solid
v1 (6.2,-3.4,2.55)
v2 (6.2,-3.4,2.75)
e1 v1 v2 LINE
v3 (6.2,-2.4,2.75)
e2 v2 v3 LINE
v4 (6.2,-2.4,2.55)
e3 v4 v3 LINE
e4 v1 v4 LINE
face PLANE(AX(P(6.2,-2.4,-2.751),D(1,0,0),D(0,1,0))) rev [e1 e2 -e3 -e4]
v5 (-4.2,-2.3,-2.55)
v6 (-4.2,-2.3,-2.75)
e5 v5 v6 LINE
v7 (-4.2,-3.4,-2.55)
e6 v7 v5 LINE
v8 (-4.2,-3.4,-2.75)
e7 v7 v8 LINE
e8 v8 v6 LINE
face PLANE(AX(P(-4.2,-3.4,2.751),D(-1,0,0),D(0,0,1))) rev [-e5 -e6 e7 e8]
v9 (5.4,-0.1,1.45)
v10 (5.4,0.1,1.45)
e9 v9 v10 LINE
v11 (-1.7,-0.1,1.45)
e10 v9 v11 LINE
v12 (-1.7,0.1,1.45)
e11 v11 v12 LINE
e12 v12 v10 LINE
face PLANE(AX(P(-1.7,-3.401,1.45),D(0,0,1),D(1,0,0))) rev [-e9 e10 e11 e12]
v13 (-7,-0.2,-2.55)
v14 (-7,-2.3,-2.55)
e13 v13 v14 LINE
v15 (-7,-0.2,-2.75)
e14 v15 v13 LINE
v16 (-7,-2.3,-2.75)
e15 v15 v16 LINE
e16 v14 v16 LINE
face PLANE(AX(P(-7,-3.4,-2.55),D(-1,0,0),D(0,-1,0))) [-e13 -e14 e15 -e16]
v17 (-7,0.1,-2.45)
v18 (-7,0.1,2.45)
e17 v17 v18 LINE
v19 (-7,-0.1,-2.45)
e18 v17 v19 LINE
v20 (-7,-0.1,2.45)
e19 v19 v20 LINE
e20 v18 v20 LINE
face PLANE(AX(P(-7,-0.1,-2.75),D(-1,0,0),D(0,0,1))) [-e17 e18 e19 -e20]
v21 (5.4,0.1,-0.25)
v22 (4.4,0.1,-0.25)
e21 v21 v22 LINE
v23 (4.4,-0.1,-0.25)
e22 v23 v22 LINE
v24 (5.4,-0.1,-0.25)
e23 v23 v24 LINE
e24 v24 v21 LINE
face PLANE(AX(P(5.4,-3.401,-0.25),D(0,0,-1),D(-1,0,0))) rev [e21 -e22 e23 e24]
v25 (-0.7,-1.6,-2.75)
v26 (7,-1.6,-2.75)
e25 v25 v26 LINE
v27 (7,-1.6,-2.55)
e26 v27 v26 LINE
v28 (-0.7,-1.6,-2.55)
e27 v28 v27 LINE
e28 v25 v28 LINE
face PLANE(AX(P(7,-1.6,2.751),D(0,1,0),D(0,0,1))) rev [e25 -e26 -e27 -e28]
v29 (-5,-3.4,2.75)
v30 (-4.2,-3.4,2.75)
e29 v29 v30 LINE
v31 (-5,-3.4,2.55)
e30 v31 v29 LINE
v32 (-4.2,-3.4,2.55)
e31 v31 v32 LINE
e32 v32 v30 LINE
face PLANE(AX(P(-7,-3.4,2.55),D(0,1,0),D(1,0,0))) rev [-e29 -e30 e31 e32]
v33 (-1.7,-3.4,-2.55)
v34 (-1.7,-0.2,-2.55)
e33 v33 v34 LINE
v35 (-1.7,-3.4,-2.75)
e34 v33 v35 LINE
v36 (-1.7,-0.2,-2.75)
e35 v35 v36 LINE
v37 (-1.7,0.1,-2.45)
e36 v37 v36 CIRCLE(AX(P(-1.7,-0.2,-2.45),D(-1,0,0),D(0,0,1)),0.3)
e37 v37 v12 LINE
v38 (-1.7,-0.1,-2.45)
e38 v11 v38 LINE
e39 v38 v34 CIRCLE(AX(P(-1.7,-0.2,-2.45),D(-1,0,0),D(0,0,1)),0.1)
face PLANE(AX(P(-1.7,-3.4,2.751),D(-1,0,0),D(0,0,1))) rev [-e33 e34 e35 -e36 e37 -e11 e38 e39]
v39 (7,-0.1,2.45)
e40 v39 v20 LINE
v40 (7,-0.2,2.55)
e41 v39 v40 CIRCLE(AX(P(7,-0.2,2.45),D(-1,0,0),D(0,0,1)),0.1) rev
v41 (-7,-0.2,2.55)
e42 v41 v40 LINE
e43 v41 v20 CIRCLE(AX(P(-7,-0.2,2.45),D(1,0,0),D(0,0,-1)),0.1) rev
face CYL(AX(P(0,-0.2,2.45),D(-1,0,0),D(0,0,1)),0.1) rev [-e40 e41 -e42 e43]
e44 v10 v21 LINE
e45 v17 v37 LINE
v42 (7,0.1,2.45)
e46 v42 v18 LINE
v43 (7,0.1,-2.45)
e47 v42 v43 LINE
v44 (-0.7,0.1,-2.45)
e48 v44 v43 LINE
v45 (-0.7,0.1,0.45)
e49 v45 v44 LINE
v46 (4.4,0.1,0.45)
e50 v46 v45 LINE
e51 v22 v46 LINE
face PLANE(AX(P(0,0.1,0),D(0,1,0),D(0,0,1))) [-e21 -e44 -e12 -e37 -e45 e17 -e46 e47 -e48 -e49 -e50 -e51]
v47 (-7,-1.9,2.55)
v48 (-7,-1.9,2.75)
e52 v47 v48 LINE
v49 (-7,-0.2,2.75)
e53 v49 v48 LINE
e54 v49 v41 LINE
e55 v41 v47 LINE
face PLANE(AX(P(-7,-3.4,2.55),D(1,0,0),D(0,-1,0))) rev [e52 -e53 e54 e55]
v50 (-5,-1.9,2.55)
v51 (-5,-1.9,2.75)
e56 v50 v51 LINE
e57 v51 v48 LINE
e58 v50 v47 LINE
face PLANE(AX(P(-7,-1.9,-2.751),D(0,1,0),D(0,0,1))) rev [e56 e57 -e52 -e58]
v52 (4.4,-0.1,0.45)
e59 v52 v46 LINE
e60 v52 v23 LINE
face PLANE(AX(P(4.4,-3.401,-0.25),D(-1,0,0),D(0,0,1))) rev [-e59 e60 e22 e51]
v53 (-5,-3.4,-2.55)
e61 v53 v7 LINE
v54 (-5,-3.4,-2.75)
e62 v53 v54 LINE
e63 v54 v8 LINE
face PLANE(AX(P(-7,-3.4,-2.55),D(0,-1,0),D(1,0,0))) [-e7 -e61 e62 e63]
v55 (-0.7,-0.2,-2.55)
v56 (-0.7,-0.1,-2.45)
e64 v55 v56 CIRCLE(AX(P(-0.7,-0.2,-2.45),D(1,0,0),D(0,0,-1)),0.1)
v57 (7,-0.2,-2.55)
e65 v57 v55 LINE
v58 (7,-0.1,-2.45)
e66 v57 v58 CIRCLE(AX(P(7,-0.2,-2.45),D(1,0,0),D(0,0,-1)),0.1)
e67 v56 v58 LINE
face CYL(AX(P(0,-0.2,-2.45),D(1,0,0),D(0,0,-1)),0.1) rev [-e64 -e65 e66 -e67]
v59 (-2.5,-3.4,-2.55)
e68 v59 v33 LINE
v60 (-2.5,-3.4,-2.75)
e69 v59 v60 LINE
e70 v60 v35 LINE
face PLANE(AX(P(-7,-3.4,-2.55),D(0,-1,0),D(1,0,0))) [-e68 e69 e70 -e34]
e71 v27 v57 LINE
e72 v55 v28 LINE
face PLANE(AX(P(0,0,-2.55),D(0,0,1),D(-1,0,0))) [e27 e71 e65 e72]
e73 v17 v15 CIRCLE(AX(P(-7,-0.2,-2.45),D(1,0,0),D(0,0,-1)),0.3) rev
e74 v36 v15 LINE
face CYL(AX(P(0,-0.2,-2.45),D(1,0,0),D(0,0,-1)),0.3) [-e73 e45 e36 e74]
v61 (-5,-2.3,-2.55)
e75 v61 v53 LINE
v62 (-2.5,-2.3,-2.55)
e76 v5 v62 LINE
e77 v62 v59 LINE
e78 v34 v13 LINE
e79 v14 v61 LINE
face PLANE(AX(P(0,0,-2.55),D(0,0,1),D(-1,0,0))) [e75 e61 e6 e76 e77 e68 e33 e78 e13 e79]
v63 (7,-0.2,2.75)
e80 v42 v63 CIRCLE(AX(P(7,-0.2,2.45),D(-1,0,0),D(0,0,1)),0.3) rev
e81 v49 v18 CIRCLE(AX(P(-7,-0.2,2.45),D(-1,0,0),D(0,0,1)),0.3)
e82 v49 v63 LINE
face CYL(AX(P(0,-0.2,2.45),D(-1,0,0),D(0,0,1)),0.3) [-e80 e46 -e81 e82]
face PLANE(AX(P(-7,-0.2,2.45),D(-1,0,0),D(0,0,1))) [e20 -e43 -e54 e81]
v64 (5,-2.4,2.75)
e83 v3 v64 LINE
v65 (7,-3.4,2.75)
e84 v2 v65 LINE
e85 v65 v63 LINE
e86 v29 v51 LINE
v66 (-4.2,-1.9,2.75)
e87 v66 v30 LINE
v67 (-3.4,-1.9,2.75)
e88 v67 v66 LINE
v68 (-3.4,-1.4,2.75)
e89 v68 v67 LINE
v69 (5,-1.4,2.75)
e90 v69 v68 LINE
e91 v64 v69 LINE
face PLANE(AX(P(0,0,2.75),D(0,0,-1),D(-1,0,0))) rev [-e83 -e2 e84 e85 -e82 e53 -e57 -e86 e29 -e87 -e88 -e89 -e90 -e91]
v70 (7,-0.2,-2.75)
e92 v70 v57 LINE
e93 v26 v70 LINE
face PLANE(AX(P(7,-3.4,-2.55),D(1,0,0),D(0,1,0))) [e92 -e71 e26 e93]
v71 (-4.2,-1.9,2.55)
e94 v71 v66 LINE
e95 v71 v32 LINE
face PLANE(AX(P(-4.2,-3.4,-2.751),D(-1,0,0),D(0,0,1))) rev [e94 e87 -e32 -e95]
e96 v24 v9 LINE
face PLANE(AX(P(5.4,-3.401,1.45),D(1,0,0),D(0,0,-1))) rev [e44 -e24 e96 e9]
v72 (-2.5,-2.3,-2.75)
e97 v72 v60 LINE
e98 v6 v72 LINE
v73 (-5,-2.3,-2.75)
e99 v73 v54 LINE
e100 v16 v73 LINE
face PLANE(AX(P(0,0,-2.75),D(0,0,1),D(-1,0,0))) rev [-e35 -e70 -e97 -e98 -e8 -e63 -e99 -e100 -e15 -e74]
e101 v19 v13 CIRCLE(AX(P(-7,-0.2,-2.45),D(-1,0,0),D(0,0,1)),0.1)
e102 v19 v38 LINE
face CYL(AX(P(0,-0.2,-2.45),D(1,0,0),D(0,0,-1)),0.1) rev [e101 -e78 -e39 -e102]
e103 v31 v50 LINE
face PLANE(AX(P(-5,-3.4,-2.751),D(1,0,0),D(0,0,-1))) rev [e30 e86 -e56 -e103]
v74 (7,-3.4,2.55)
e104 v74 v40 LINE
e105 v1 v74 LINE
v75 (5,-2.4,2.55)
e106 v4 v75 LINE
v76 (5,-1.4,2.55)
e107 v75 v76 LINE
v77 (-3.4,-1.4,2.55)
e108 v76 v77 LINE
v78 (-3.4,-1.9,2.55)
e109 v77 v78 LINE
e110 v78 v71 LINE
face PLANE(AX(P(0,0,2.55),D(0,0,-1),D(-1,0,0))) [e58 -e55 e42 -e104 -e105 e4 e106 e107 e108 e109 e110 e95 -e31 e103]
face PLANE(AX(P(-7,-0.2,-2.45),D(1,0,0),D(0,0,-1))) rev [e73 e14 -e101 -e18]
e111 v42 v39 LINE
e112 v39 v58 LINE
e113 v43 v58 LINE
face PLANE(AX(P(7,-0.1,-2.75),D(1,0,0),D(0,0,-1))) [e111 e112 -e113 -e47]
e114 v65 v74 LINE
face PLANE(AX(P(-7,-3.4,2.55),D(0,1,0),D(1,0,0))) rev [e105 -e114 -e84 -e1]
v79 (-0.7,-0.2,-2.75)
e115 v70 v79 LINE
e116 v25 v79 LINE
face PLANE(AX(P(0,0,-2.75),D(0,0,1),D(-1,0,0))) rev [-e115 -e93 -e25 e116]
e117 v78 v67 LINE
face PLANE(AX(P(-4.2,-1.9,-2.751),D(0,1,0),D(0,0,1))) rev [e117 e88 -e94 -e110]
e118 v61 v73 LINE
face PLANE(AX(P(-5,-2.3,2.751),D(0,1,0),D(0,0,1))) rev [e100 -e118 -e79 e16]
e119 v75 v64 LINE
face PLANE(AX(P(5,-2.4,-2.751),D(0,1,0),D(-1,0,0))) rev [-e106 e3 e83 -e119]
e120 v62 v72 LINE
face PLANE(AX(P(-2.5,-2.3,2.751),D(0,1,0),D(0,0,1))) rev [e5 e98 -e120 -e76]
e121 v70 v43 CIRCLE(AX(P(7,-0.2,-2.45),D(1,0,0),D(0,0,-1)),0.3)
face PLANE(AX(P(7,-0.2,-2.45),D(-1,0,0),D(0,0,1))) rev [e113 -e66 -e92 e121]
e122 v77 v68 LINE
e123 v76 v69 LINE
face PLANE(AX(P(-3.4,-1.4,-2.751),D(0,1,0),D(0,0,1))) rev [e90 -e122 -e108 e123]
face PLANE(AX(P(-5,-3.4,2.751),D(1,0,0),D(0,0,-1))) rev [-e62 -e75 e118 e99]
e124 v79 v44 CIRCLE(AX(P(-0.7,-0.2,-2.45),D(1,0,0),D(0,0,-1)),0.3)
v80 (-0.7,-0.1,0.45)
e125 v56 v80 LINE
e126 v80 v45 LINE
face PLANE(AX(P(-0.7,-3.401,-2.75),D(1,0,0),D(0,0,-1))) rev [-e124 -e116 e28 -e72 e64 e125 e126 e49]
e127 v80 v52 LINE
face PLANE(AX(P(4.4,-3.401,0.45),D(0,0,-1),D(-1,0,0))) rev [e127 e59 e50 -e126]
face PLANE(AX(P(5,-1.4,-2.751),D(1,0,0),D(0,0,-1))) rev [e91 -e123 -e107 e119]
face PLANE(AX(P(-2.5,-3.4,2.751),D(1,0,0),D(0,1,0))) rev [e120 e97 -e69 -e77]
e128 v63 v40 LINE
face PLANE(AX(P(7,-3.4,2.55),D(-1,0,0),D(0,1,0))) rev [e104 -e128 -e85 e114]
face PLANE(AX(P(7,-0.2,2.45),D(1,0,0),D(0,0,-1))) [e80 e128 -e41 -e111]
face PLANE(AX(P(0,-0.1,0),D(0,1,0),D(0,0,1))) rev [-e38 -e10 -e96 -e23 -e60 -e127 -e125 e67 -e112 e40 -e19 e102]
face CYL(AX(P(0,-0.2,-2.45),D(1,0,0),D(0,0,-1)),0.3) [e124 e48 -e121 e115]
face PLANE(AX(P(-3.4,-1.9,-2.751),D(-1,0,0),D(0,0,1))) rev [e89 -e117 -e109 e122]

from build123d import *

# Parameters (mm, degrees)
SKETCH2_W              = 14
SKETCH2_H              = 5.5
BOSS_EXTRUDE1_DEPTH    = 0.1
SKETCH3_W              = 14
SKETCH3_H              = 3.5
BOSS_EXTRUDE2_DEPTH    = 0.2
CONVERT_SOLID1_START   = -7
CONVERT_SOLID1_DEPTH   = 14
CONVERT_SOLID1_2_DEPTH = 14
CUT_EXTRUDE1_REACH     = 11.529
SKETCH8_W              = 2
SKETCH8_H              = 1.5
CUT_EXTRUDE2_REACH     = 11.529
SKETCH9_W              = 8.7
SKETCH9_H              = 1.8
SKETCH9_W_2            = 1.7
SKETCH9_H_2            = 1.1
SKETCH9_W_3            = 2
CUT_EXTRUDE3_REACH     = 10.295


# Read off the part's stored shape, not the designer's step: Convert-Solid1
with BuildPart() as part:
    # Sketch2 → Boss-Extrude1 (new, symmetric)
    with BuildSketch(Plane(origin=(0, 0, 0), x_dir=(1, 0, 0), z_dir=(0, 1, 0))):
        Rectangle(SKETCH2_W, SKETCH2_H)
    extrude(amount=BOSS_EXTRUDE1_DEPTH, both=True)

    # Sketch3 → Boss-Extrude2 (add)
    with BuildSketch(Plane.XY.offset(2.75)):
        with Locations((0, -1.65)):
            Rectangle(SKETCH3_W, SKETCH3_H)
    boss_extrude2 = extrude(amount=-BOSS_EXTRUDE2_DEPTH)

    # Mirror1: Boss-Extrude2 across plane
    add(boss_extrude2.mirror(Plane.XY))

    # Convert-Solid1 outline → Convert-Solid1 (cut)
    with BuildSketch(Plane.YZ.offset(CONVERT_SOLID1_START)):
        with BuildLine():
            Line((0.1, 2.75), (-0.2, 2.75))
            ThreePointArc((-0.2, 2.75), (0.012132034, 2.662132034), (0.1, 2.45))
            Line((0.1, 2.45), (0.1, 2.75))
        make_face()
        with BuildLine():
            Line((0.1, -2.75), (0.1, -2.45))
            ThreePointArc((0.1, -2.45), (0.012132034, -2.662132034), (-0.2, -2.75))
            Line((-0.2, -2.75), (0.1, -2.75))
        make_face()
    extrude(amount=CONVERT_SOLID1_DEPTH, mode=Mode.SUBTRACT)

    # Convert-Solid1 2 outline → Convert-Solid1 2 (add)
    with BuildSketch(Plane.YZ.offset(CONVERT_SOLID1_START)):
        with BuildLine():
            Line((-0.1, 2.55), (-0.2, 2.55))
            ThreePointArc((-0.2, 2.55), (-0.129289322, 2.520710678), (-0.1, 2.45))
            Line((-0.1, 2.45), (-0.1, 2.55))
        make_face()
        with BuildLine():
            Line((-0.1, -2.55), (-0.1, -2.45))
            ThreePointArc((-0.1, -2.45), (-0.129289322, -2.520710678), (-0.2, -2.55))
            Line((-0.2, -2.55), (-0.1, -2.55))
        make_face()
    extrude(amount=CONVERT_SOLID1_2_DEPTH)

    # Sketch8 → Cut-Extrude1 (cut, up to next)
    with BuildSketch(Plane.XY.offset(2.75), mode=Mode.PRIVATE) as cut_extrude1_sk1:
        Polygon((-4.2, -3.4), (-4.2, -1.9), (-3.4, -1.9), (-3.4, -1.4), (5, -1.4), (5, -2.4), (6.2, -2.4), (6.2, -3.4), align=None)
    cut_extrude1_tool1 = extrude(cut_extrude1_sk1.sketch, amount=-CUT_EXTRUDE1_REACH, mode=Mode.PRIVATE) & part.part
    # Sketch8 → Cut-Extrude1 (cut, up to next)
    with BuildSketch(Plane.XY.offset(2.75), mode=Mode.PRIVATE) as cut_extrude1_sk2:
        with Locations((-6, -2.65)):
            Rectangle(SKETCH8_W, SKETCH8_H)
    cut_extrude1_tool2 = extrude(cut_extrude1_sk2.sketch, amount=-CUT_EXTRUDE1_REACH, mode=Mode.PRIVATE) & part.part
    add(cut_extrude1_tool1.solids().sort_by_distance((0.8125, -2.446875, 2.75))[0], mode=Mode.SUBTRACT)
    add(cut_extrude1_tool2.solids().sort_by_distance((-6, -2.65, 2.75))[0], mode=Mode.SUBTRACT)

    # Sketch9 → Cut-Extrude2 (cut, up to next)
    with BuildSketch(Plane(origin=(0, 0, -2.75), x_dir=(-1, 0, 0), z_dir=(0, 0, -1)), mode=Mode.PRIVATE) as cut_extrude2_sk1:
        with Locations((-2.65, -2.5)):
            Rectangle(SKETCH9_W, SKETCH9_H)
    cut_extrude2_tool1 = extrude(cut_extrude2_sk1.sketch, amount=-CUT_EXTRUDE2_REACH, mode=Mode.PRIVATE) & part.part
    # Sketch9 → Cut-Extrude2 (cut, up to next)
    with BuildSketch(Plane(origin=(0, 0, -2.75), x_dir=(-1, 0, 0), z_dir=(0, 0, -1)), mode=Mode.PRIVATE) as cut_extrude2_sk2:
        with Locations((3.35, -2.85)):
            Rectangle(SKETCH9_W_2, SKETCH9_H_2)
    cut_extrude2_tool2 = extrude(cut_extrude2_sk2.sketch, amount=-CUT_EXTRUDE2_REACH, mode=Mode.PRIVATE) & part.part
    # Sketch9 → Cut-Extrude2 (cut, up to next)
    with BuildSketch(Plane(origin=(0, 0, -2.75), x_dir=(-1, 0, 0), z_dir=(0, 0, -1)), mode=Mode.PRIVATE) as cut_extrude2_sk3:
        with Locations((6, -2.85)):
            Rectangle(SKETCH9_W_3, SKETCH9_H_2)
    cut_extrude2_tool3 = extrude(cut_extrude2_sk3.sketch, amount=-CUT_EXTRUDE2_REACH, mode=Mode.PRIVATE) & part.part
    add(cut_extrude2_tool1.solids().sort_by_distance((2.65, -2.5, -2.75))[0], mode=Mode.SUBTRACT)
    add(cut_extrude2_tool2.solids().sort_by_distance((-3.35, -2.85, -2.75))[0], mode=Mode.SUBTRACT)
    add(cut_extrude2_tool3.solids().sort_by_distance((-6, -2.85, -2.75))[0], mode=Mode.SUBTRACT)

    # Sketch10 → Cut-Extrude3 (cut, up to next)
    with BuildSketch(Plane(origin=(0, 0.1, 0), x_dir=(1, 0, 0), z_dir=(0, 1, 0)), mode=Mode.PRIVATE) as cut_extrude3_sk1:
        Polygon((-1.7, -1.45), (5.4, -1.45), (5.4, 0.25), (4.4, 0.25), (4.4, -0.45), (-0.7, -0.45), (-0.7, 2.75), (-1.7, 2.75), align=None)
    cut_extrude3_tool1 = extrude(cut_extrude3_sk1.sketch, amount=-CUT_EXTRUDE3_REACH, mode=Mode.PRIVATE) & part.part
    add(cut_extrude3_tool1.solids().sort_by_distance((1.85, 0.1, 1.367508))[0], mode=Mode.SUBTRACT)


solid = part.part
